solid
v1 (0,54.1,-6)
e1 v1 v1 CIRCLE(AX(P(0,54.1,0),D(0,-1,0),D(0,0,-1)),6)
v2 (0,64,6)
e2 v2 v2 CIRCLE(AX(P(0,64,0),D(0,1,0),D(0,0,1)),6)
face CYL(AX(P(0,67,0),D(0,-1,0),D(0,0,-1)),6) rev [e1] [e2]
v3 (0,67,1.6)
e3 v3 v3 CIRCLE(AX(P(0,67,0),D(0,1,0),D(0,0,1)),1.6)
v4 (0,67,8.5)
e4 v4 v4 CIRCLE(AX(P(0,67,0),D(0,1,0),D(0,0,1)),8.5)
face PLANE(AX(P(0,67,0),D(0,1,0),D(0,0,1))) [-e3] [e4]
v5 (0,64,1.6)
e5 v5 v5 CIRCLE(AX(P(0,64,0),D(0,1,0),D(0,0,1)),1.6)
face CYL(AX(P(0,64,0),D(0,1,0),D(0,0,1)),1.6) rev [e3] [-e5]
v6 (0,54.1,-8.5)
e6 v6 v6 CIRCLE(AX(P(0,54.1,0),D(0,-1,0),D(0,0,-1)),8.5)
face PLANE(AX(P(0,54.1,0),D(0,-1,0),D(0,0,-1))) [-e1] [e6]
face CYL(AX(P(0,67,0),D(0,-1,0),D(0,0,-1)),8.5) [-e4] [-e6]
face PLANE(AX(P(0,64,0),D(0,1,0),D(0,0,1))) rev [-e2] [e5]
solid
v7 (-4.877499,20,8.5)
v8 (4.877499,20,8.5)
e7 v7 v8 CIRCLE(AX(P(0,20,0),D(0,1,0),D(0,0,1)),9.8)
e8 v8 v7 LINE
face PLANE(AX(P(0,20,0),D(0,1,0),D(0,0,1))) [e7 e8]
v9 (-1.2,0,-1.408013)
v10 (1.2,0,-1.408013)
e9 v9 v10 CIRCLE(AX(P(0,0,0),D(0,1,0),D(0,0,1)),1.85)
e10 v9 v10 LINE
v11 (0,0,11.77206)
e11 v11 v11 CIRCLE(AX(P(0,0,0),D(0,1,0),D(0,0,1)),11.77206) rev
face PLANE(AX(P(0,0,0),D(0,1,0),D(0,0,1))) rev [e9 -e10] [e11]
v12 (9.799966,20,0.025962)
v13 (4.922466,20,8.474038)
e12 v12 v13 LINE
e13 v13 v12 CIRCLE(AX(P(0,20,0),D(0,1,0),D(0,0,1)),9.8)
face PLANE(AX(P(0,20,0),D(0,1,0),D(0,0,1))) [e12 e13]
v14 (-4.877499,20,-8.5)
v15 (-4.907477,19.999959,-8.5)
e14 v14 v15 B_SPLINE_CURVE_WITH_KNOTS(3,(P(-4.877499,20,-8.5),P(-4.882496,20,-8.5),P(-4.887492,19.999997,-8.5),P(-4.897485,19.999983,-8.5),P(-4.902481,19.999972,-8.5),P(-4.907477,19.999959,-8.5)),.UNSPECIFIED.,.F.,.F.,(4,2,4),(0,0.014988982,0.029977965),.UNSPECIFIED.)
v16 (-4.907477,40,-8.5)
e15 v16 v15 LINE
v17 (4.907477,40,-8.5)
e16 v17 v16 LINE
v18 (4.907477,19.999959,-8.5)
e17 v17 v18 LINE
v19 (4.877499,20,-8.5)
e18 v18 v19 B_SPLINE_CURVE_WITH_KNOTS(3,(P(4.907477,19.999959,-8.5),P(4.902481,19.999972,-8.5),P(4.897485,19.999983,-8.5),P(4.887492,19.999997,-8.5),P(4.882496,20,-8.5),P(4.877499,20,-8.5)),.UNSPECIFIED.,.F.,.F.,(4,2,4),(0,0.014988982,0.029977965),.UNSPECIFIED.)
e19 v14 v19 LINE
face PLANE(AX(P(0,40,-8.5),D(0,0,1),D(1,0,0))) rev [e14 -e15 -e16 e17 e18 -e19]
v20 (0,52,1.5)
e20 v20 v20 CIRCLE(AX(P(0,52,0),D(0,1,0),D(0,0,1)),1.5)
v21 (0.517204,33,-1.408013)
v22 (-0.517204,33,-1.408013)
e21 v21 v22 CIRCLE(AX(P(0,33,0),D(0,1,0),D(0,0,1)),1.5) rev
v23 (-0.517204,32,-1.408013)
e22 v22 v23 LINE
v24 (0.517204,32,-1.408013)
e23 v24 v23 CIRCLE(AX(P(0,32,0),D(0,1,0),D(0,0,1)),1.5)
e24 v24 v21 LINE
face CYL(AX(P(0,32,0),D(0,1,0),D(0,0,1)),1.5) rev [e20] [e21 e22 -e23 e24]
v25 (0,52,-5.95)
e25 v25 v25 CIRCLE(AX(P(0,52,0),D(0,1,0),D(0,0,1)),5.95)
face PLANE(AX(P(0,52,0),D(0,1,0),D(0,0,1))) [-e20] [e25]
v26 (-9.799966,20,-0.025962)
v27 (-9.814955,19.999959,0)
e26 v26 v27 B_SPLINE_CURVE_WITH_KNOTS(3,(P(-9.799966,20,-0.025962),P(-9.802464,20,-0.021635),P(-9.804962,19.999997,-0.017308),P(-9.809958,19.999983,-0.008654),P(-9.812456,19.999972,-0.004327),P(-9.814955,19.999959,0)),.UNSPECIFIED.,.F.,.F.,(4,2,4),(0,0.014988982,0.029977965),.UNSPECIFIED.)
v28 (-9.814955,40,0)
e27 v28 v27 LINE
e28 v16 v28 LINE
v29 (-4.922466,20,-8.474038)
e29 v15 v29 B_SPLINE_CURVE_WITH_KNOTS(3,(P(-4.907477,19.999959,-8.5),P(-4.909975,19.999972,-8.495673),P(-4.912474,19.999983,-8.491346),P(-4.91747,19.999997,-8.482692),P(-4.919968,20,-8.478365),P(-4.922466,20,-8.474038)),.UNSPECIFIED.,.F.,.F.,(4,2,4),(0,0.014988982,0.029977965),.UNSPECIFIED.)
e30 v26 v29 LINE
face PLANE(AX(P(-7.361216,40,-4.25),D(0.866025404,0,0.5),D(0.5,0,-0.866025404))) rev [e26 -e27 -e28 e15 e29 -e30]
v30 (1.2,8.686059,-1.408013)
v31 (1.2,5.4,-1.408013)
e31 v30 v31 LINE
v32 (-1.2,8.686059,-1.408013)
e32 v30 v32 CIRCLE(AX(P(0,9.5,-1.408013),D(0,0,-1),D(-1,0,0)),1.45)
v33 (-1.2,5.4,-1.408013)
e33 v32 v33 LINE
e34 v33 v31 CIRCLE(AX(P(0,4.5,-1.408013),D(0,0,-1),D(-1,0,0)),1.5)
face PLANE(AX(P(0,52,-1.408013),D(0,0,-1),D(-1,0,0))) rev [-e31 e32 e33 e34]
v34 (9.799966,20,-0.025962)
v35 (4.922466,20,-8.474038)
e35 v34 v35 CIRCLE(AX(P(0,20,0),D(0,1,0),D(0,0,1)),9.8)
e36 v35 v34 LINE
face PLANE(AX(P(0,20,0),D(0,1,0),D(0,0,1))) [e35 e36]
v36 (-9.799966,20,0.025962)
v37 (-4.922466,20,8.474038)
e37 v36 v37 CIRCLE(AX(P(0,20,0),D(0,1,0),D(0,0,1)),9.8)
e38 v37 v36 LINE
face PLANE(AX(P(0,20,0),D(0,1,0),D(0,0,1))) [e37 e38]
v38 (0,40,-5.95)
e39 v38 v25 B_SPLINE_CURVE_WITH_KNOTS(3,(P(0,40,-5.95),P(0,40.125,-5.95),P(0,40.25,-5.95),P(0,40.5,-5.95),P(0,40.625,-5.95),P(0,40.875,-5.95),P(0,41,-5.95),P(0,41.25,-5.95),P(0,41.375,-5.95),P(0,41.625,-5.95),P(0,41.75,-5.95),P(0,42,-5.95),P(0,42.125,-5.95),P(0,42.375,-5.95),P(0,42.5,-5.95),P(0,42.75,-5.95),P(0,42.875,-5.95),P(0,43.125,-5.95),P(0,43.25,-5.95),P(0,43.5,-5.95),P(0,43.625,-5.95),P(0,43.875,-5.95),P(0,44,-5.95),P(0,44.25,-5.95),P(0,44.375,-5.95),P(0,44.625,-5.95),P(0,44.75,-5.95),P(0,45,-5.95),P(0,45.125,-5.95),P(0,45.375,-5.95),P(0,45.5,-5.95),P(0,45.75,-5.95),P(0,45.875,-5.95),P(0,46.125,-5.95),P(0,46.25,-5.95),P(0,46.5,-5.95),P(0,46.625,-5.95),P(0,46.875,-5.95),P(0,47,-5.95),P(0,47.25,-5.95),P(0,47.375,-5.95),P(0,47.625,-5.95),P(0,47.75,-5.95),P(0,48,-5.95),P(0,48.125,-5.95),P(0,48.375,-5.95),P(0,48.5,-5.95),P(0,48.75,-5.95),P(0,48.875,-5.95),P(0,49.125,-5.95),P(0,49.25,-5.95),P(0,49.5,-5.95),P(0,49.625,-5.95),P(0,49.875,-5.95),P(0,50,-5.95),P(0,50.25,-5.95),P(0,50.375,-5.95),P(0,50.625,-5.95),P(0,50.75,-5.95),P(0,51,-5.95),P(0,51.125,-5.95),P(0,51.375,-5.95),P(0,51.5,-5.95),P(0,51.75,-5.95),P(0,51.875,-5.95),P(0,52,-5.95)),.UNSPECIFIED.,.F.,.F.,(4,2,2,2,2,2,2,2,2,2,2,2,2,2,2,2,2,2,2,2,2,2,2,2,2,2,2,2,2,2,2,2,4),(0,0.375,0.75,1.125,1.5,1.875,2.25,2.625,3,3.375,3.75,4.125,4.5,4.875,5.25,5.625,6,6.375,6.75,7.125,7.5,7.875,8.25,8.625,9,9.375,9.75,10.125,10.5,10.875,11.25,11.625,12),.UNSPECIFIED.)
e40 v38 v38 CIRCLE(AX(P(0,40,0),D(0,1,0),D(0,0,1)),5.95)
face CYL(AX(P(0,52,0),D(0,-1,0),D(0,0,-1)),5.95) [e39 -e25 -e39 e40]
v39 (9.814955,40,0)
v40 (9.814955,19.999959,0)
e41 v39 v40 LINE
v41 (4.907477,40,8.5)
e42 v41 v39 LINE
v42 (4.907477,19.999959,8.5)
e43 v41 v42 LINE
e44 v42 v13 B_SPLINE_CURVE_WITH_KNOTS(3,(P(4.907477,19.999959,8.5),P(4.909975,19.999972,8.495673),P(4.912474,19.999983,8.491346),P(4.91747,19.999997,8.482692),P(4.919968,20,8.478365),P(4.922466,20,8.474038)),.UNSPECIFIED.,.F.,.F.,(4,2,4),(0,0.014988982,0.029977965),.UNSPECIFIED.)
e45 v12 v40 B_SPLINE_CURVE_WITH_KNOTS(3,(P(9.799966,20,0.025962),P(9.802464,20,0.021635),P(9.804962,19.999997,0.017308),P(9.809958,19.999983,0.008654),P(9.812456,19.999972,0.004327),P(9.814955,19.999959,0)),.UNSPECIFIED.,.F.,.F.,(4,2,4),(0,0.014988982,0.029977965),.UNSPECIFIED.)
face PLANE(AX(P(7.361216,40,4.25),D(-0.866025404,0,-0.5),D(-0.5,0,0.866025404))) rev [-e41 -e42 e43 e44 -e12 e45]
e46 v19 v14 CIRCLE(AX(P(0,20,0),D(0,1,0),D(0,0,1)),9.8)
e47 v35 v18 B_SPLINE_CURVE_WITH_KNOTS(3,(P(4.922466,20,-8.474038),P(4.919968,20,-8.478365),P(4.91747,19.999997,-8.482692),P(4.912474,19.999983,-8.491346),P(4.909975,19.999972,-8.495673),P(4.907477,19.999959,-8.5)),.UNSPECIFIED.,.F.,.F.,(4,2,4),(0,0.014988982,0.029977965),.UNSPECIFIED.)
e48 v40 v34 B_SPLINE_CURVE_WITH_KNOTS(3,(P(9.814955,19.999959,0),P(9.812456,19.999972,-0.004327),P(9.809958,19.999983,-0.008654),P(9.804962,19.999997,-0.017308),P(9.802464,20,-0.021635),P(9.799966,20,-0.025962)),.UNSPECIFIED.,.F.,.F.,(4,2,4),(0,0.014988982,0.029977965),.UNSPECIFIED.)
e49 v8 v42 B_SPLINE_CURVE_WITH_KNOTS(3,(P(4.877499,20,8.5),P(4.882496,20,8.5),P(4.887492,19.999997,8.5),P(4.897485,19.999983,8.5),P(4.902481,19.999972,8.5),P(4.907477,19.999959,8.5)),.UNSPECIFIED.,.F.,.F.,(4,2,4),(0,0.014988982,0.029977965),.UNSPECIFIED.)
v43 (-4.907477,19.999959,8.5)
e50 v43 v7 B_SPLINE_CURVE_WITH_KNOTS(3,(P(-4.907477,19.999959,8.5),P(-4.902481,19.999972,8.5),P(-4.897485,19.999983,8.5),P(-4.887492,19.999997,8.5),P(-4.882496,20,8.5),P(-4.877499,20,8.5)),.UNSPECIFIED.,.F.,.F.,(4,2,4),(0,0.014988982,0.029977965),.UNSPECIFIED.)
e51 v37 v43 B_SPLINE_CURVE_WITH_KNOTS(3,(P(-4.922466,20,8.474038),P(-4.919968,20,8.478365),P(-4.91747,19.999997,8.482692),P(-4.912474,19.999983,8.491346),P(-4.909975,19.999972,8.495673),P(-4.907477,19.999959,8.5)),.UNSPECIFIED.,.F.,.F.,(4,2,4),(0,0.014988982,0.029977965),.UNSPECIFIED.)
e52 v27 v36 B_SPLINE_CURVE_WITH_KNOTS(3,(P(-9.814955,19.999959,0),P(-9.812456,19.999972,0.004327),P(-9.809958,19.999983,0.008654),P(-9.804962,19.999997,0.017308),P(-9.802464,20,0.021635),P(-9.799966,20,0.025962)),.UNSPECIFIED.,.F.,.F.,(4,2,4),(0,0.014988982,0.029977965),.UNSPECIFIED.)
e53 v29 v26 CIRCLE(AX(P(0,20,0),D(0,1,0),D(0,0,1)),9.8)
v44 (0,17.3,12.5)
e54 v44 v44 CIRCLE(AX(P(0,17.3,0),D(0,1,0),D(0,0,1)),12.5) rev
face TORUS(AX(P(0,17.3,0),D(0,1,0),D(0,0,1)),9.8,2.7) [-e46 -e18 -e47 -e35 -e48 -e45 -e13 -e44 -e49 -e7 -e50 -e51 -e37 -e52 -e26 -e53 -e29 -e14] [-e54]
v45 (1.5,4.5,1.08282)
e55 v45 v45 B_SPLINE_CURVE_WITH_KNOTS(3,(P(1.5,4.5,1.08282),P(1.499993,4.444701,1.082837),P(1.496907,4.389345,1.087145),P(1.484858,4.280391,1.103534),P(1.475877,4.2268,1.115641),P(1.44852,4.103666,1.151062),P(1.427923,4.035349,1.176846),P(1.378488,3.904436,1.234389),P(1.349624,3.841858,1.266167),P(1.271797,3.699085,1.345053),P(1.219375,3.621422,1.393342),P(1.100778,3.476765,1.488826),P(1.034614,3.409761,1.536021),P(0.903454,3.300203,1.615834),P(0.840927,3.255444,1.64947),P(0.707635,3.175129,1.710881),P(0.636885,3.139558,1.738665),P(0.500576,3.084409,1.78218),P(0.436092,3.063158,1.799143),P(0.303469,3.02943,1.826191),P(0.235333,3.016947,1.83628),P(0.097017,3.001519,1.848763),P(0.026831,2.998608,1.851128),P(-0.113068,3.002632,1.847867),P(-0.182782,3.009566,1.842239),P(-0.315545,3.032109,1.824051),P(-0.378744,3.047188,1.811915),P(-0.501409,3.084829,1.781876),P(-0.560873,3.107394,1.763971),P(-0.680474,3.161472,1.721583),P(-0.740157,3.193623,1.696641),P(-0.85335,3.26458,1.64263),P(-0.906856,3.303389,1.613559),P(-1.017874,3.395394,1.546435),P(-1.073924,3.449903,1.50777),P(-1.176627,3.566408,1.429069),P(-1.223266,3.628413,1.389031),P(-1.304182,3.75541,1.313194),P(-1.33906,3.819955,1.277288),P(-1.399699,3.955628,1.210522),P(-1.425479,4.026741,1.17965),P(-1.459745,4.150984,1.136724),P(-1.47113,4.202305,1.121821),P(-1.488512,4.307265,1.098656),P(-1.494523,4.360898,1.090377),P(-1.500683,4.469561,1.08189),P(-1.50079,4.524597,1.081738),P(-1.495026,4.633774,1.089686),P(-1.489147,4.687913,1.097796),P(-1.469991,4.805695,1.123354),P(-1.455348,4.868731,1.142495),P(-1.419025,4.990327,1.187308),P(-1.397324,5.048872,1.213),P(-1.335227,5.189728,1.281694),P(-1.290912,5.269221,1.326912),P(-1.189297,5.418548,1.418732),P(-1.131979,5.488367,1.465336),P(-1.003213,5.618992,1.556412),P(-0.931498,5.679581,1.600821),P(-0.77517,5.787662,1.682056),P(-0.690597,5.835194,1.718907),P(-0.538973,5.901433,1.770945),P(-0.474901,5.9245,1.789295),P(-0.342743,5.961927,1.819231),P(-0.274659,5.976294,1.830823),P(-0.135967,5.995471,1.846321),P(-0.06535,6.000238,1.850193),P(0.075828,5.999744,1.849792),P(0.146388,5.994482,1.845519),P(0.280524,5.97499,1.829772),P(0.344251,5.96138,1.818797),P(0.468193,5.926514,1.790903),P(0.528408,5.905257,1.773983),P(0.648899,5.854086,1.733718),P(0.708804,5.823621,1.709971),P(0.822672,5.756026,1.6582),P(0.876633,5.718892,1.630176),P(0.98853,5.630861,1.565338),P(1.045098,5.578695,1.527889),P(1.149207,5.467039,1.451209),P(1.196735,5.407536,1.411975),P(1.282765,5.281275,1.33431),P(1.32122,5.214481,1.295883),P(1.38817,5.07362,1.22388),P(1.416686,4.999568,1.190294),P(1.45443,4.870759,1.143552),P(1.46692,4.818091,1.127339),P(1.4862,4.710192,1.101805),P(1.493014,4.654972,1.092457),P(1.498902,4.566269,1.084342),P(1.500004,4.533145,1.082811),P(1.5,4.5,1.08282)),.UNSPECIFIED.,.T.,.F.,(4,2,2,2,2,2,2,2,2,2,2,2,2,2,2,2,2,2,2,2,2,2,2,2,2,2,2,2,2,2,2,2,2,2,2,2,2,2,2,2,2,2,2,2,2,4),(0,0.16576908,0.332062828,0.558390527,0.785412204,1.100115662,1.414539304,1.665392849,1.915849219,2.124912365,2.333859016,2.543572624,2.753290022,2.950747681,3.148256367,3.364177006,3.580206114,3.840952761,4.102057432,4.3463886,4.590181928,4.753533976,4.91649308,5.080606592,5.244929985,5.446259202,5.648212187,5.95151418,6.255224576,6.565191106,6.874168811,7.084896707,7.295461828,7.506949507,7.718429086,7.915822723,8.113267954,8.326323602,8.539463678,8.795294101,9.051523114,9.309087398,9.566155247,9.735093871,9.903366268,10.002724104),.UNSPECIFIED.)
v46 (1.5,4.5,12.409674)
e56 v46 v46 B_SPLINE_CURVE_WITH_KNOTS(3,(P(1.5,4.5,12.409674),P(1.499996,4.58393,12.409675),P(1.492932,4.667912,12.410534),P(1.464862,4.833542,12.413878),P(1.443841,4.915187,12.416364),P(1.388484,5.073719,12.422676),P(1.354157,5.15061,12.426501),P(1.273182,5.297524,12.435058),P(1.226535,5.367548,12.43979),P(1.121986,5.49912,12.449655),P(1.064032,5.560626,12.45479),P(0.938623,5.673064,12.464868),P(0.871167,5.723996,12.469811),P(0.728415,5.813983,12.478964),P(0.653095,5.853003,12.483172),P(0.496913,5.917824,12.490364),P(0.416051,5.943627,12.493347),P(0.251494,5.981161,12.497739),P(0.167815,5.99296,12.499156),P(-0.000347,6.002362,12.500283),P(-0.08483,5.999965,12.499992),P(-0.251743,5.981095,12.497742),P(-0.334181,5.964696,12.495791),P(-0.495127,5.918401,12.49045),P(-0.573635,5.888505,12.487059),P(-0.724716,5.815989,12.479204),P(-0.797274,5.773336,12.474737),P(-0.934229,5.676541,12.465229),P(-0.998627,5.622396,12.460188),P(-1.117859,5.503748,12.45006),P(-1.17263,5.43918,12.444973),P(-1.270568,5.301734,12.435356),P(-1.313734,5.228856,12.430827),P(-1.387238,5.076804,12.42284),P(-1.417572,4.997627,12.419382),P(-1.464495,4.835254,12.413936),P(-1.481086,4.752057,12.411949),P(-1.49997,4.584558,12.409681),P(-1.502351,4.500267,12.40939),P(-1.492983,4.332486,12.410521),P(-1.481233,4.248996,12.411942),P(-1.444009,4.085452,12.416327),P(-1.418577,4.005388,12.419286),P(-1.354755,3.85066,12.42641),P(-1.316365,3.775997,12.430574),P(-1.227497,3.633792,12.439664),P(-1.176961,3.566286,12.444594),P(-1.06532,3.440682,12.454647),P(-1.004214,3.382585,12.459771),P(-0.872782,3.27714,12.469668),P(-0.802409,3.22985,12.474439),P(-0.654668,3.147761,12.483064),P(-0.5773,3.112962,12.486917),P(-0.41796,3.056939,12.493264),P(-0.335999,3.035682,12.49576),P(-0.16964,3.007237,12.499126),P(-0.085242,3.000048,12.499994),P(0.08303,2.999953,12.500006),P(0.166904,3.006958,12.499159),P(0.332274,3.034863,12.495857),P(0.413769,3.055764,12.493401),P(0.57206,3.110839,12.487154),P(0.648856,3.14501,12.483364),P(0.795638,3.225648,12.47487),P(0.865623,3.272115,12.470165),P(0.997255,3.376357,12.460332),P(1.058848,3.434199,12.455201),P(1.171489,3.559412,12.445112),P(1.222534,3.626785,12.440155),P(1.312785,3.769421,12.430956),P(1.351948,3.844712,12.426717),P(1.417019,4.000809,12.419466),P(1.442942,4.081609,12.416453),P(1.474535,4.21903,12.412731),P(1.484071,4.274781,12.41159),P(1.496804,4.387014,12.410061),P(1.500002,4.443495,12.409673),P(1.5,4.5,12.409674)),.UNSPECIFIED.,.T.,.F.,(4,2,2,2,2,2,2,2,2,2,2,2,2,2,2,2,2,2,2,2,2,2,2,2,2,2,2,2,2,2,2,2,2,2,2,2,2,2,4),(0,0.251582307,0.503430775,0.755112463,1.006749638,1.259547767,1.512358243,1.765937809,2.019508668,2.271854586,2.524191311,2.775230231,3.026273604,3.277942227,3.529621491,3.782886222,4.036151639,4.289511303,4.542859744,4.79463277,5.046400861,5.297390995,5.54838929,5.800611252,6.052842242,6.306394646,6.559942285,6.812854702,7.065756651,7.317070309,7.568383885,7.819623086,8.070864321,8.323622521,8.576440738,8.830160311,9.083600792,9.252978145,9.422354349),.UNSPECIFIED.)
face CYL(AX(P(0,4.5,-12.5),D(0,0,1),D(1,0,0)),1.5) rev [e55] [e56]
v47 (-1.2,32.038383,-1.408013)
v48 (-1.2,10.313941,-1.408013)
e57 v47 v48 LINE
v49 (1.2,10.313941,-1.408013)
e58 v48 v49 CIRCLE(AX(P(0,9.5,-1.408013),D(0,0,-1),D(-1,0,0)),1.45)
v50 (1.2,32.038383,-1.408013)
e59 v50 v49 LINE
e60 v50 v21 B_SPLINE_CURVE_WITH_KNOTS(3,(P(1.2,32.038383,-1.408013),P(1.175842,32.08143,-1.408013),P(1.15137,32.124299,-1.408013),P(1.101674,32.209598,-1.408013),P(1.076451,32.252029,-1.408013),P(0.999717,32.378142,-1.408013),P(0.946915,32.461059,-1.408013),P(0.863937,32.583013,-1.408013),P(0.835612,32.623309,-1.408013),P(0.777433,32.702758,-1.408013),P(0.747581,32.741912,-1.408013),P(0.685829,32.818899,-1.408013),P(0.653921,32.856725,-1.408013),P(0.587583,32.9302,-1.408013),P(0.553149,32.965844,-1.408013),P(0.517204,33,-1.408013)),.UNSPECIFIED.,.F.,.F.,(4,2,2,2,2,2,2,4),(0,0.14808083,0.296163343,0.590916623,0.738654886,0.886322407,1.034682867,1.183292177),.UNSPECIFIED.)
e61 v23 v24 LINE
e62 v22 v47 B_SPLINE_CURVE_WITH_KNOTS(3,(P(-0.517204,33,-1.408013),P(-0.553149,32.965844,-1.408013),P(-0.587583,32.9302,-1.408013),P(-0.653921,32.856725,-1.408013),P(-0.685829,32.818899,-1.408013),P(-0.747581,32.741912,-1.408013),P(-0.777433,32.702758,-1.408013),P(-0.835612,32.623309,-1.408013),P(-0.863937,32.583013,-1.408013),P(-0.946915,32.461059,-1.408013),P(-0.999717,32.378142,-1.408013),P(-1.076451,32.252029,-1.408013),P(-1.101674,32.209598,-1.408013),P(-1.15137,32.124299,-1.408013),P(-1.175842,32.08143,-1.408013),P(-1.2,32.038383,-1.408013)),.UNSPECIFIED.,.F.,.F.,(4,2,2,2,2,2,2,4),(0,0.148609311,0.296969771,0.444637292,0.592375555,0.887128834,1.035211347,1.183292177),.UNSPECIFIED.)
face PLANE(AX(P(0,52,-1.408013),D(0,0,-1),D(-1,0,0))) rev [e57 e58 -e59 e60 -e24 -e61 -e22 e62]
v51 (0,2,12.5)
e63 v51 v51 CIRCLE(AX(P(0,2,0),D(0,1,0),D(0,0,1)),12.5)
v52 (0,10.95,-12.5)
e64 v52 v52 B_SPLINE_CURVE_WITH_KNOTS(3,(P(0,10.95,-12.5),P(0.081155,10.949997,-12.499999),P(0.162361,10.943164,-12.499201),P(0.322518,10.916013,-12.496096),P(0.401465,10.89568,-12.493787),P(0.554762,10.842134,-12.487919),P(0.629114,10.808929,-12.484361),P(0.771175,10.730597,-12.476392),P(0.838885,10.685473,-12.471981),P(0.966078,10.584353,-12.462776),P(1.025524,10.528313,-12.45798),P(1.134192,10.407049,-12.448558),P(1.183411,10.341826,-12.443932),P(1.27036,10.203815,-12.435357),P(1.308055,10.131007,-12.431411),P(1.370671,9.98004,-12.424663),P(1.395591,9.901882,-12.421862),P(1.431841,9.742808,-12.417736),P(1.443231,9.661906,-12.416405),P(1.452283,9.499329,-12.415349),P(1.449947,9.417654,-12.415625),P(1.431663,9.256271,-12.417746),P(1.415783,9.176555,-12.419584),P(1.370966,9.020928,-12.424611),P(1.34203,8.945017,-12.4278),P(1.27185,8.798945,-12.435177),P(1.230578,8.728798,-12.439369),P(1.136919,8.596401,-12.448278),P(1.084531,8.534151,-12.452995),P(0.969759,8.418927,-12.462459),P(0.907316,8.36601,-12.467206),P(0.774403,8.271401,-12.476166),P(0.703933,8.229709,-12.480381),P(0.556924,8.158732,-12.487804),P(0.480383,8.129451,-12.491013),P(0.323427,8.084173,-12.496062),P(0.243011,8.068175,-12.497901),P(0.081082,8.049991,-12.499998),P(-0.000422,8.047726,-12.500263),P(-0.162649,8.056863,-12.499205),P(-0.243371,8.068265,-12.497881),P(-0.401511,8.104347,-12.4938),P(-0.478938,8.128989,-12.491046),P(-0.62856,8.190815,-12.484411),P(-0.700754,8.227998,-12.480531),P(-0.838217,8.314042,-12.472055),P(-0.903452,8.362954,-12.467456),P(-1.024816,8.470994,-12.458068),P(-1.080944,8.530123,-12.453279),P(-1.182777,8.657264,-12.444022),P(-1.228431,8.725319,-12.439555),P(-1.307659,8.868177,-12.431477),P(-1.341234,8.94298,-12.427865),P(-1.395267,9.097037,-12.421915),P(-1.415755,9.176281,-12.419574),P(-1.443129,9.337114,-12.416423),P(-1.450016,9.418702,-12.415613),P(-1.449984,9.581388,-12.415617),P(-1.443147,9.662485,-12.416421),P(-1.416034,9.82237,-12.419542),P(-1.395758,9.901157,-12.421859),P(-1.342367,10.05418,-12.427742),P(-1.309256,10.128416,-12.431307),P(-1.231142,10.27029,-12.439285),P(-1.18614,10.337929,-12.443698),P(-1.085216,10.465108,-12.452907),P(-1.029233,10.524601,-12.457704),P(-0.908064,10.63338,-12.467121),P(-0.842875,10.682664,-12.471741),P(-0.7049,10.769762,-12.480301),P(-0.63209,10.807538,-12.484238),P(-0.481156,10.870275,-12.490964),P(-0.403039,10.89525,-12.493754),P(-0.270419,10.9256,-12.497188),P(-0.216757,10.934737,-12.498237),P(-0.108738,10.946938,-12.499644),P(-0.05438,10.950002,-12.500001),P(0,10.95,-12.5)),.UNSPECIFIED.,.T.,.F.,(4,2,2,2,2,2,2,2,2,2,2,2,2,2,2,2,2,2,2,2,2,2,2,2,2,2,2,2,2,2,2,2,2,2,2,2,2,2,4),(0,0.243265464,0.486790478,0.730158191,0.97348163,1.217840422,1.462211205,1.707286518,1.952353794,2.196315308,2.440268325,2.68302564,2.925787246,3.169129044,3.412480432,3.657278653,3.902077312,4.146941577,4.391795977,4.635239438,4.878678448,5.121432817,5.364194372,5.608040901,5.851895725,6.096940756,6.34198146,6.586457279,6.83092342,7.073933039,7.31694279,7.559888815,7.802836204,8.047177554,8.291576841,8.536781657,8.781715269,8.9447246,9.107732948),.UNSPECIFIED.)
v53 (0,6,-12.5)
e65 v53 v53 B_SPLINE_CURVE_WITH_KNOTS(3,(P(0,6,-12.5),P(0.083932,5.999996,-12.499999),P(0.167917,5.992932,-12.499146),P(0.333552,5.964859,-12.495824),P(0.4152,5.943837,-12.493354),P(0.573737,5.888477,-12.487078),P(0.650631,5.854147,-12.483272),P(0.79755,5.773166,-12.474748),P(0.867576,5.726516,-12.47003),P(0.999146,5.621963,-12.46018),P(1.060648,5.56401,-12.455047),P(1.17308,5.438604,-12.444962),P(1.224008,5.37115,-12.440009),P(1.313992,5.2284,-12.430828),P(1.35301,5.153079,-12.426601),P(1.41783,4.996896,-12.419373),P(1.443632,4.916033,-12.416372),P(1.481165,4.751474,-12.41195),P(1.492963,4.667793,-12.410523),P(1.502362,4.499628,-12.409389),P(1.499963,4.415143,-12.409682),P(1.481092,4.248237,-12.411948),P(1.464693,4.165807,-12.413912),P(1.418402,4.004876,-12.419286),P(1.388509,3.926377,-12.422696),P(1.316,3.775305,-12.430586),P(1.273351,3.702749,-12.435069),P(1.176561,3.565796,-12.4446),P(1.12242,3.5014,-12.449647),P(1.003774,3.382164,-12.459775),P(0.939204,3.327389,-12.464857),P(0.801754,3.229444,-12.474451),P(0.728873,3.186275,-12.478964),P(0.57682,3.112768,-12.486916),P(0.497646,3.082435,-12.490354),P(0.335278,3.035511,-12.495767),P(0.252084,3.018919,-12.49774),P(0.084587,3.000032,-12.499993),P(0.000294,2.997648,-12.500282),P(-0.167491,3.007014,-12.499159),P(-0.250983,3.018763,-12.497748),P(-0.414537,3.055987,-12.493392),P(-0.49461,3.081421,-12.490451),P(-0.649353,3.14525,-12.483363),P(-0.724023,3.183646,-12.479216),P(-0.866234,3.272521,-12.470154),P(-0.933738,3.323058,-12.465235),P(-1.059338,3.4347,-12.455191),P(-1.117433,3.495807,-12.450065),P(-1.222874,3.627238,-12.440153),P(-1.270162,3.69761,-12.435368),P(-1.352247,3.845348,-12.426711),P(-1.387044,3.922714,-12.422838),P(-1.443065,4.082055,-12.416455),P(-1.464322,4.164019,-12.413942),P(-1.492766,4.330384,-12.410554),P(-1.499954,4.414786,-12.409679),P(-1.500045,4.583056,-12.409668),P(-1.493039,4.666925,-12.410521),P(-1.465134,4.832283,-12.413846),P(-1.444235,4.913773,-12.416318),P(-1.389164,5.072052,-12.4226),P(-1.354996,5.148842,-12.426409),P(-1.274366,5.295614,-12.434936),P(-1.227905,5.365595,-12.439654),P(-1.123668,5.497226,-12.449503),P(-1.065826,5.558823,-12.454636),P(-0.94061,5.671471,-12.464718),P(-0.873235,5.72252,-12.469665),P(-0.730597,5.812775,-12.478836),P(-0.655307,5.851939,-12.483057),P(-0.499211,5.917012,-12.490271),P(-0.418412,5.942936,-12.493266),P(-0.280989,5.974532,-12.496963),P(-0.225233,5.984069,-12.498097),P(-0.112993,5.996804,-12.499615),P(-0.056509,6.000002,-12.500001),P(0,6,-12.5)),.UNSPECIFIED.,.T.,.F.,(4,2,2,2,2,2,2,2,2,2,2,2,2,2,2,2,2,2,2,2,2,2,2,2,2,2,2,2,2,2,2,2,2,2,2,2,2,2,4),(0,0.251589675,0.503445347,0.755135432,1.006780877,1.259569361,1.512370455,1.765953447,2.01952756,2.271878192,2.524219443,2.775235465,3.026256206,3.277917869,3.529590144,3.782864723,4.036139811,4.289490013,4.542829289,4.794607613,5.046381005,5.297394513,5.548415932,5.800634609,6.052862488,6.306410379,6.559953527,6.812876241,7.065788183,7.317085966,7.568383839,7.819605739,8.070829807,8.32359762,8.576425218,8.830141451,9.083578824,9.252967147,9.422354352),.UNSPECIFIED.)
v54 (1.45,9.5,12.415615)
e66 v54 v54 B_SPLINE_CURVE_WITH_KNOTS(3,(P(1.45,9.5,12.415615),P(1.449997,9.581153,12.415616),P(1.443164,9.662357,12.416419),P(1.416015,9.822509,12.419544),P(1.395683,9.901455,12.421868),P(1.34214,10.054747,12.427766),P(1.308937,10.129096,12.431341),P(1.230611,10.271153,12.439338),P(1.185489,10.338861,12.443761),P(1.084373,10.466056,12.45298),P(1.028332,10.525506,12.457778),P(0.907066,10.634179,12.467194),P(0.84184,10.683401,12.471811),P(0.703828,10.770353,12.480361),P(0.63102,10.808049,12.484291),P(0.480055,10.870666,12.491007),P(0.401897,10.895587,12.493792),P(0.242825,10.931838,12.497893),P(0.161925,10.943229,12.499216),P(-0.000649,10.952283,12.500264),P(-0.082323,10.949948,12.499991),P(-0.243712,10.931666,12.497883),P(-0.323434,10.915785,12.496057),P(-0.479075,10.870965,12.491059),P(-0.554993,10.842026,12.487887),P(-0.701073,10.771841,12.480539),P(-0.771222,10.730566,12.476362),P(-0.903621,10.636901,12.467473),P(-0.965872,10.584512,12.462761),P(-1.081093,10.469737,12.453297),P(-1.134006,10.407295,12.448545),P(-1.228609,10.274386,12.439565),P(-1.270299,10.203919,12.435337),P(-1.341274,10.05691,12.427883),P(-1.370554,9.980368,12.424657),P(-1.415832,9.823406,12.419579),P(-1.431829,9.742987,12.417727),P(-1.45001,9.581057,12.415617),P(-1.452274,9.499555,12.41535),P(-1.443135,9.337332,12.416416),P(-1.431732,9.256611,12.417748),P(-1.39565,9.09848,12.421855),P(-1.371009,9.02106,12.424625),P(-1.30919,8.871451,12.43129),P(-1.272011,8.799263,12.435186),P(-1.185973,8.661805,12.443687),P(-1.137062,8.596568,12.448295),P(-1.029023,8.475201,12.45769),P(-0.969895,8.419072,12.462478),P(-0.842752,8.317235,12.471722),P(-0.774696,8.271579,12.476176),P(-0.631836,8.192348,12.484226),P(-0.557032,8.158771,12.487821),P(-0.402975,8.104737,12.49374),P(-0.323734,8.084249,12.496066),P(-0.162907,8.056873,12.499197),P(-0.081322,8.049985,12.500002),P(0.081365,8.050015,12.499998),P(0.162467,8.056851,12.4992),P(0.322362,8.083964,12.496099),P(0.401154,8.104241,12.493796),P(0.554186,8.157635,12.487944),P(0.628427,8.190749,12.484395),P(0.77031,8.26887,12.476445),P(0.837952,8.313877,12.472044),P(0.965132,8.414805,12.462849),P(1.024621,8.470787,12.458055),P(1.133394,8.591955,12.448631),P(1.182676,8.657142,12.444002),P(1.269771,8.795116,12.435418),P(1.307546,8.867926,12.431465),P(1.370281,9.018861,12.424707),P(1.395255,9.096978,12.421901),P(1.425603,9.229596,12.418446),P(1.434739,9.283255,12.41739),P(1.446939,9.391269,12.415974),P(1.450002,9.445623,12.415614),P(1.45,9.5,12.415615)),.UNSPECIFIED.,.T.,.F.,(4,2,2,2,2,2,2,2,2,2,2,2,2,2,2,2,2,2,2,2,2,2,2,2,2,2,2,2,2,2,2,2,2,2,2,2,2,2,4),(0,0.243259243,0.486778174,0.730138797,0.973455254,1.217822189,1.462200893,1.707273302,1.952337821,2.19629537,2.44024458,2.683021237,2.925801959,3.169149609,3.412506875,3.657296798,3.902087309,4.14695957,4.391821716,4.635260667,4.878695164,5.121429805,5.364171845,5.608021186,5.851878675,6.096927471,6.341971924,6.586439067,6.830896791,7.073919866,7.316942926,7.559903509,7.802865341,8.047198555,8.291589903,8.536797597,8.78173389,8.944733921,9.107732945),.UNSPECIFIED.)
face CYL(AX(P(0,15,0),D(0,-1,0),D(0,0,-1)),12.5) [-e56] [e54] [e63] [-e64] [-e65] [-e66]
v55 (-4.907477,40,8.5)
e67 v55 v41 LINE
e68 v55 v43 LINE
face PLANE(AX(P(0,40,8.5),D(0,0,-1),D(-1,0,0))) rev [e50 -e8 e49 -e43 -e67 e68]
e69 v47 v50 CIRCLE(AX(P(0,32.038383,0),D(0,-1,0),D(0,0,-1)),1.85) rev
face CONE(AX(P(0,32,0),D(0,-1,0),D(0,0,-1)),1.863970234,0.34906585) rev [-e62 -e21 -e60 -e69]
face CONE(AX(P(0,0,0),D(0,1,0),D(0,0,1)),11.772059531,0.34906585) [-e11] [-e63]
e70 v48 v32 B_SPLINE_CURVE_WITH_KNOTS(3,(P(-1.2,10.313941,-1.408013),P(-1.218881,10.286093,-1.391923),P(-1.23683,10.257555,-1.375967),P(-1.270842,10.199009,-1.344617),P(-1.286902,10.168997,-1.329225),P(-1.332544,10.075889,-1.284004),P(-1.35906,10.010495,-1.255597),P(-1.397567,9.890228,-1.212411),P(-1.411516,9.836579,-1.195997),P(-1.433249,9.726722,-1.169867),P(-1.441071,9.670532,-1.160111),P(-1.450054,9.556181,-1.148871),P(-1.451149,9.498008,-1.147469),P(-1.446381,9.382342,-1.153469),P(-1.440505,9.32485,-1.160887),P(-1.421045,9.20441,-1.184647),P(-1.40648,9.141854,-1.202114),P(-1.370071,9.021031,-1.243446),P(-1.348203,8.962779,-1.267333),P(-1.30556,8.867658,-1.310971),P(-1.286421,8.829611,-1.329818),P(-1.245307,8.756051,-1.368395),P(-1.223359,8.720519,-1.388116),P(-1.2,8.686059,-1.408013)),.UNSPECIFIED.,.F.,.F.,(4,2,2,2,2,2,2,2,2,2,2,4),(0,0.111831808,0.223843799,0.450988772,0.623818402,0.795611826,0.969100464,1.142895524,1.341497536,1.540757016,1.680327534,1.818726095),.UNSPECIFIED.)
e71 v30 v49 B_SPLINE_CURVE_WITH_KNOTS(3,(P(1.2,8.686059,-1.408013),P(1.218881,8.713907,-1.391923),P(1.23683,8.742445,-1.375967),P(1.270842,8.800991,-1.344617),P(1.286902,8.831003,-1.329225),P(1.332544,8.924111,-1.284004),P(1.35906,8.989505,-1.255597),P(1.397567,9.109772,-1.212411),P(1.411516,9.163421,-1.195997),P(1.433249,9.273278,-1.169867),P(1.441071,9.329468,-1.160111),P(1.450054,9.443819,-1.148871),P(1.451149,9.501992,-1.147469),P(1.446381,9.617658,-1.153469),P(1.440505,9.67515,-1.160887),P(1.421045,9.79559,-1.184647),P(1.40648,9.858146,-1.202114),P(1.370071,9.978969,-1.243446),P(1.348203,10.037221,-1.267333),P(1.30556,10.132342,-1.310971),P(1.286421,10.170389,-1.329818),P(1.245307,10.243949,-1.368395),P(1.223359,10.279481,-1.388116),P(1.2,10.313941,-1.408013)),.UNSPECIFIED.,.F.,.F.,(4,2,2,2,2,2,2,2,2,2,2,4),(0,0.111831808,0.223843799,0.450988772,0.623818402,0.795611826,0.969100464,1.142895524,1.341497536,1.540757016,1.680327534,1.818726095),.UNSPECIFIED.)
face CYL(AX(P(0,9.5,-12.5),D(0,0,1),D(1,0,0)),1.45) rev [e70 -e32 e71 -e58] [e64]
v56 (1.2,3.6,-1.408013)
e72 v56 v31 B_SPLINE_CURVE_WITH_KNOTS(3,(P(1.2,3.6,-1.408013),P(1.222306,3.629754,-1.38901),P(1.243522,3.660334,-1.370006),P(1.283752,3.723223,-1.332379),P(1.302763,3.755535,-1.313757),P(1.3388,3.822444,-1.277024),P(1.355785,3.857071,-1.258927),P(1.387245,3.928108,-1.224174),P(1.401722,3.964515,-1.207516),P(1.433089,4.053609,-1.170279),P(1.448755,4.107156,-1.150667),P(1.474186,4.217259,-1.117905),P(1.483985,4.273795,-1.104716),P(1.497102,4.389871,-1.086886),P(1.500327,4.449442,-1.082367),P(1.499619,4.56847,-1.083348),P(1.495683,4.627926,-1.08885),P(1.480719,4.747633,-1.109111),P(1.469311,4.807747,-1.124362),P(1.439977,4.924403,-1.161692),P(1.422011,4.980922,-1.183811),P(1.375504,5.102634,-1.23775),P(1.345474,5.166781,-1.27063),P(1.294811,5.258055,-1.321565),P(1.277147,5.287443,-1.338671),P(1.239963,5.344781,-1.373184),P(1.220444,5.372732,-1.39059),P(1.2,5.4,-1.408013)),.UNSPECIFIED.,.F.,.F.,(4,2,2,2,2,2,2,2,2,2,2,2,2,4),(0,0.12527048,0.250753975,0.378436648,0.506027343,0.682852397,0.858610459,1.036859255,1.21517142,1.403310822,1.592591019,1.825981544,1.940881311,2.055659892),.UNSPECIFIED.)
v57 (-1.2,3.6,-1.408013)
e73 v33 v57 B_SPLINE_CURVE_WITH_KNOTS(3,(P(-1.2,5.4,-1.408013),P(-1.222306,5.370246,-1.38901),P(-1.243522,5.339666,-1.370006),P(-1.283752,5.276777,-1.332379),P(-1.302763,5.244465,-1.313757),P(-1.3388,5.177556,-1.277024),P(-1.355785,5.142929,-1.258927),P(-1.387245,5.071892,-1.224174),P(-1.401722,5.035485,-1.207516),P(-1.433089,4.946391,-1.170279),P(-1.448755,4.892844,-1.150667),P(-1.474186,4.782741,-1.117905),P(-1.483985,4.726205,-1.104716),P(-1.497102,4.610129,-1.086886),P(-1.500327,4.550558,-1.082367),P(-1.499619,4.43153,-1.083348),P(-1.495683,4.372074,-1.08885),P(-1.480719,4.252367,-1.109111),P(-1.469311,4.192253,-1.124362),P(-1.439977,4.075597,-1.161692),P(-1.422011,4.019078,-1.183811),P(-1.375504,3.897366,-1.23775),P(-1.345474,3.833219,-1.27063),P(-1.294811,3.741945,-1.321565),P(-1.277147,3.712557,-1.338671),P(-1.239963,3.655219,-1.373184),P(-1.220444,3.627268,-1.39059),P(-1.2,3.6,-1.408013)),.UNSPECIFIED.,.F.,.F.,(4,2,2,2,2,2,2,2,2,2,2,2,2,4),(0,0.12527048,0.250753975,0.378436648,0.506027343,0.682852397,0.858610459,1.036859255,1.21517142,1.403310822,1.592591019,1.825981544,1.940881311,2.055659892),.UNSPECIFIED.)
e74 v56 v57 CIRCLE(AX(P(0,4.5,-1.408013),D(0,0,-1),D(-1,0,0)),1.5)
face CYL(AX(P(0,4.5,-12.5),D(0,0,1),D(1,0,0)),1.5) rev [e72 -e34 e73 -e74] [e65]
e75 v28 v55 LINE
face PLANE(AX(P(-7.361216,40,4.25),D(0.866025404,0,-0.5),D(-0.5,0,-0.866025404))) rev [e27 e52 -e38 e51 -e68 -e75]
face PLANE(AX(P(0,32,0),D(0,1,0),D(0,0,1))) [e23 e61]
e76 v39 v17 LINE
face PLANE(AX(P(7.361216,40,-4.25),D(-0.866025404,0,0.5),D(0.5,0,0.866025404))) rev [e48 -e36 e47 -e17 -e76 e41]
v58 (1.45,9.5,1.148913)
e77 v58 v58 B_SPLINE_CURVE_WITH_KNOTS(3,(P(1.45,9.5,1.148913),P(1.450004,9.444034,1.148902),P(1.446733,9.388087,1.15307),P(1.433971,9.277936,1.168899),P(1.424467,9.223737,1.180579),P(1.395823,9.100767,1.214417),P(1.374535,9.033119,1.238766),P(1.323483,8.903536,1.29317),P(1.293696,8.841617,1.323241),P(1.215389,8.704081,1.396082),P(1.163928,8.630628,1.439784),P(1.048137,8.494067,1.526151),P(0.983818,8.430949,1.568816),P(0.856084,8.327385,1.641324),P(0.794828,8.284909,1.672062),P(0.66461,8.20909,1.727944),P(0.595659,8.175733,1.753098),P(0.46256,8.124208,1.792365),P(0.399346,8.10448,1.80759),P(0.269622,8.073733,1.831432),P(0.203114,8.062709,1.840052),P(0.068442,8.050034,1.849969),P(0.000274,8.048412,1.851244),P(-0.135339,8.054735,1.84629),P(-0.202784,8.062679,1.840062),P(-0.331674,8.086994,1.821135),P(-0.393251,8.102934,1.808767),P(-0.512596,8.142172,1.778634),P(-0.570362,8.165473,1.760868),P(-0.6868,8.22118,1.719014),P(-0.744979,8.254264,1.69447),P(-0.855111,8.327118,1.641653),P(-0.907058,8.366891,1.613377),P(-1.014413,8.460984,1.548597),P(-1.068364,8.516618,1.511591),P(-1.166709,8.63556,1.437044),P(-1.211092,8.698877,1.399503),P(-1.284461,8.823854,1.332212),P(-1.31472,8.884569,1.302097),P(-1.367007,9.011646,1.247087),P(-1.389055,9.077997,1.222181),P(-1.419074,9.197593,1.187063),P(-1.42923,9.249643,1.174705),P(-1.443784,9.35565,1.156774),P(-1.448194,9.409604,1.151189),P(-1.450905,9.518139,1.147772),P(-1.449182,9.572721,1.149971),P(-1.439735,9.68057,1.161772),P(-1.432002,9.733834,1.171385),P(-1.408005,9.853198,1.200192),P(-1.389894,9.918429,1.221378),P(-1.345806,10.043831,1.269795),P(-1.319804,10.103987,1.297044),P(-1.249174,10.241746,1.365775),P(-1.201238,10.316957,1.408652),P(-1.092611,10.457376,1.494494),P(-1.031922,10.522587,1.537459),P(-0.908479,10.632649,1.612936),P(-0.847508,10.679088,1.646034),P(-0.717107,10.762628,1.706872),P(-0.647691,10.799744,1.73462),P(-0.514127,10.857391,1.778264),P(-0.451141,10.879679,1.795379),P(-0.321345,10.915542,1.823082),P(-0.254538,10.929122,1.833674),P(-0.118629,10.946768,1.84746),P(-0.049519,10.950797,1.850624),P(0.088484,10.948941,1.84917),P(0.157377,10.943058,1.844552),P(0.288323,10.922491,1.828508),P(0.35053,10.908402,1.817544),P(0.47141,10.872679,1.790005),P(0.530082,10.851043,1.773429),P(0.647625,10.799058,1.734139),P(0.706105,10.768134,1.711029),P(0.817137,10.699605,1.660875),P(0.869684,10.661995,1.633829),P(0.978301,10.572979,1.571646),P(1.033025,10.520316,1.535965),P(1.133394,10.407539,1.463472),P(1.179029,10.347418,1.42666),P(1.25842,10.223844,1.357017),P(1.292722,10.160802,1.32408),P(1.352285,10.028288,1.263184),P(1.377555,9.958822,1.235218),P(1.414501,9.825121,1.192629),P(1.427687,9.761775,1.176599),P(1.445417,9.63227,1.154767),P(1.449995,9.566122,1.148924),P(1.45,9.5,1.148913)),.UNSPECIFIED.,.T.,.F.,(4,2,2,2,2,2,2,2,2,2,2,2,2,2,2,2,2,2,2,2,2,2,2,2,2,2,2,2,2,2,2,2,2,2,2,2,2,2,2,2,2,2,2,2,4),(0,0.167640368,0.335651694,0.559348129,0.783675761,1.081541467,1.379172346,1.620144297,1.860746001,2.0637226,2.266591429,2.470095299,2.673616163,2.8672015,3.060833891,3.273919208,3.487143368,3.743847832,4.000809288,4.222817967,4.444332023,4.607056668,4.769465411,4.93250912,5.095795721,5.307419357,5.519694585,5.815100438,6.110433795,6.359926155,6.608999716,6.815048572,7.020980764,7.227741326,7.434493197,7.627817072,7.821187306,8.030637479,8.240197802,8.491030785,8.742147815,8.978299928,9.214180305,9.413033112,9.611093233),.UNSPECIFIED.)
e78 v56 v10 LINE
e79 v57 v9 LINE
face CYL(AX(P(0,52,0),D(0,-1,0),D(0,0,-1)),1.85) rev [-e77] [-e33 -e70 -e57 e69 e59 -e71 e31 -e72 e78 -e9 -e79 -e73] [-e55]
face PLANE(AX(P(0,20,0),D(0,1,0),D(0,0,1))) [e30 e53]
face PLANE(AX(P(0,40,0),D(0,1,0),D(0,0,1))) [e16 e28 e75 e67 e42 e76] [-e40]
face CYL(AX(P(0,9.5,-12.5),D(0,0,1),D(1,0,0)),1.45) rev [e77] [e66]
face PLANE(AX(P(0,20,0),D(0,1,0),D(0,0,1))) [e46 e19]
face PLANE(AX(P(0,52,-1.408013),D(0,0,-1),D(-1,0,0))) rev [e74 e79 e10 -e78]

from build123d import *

# Parameters (mm, degrees)
SKETCH1_R               = 5.95
BOSS_EXTRUDE1_DEPTH     = 40
SKETCH1_2_R             = 5.95
BOSS_EXTRUDE2_DEPTH     = 52
SKETCH2_R               = 12.5
BOSS_EXTRUDE3_DEPTH     = 15
CUT_EXTRUDE1_DEPTH      = 55.922672914
CUT_EXTRUDE1_DEPTH_BACK = 55.922672914
SKETCH3_R               = 1.45
SKETCH3_R_2             = 1.5
SKETCH5_R               = 12.5
BOSS_EXTRUDE4_DEPTH     = 5
SKETCH7_R               = 8.5
SKETCH7_R_2             = 6
BOSS_EXTRUDE5_DEPTH     = 15
SKETCH8_R               = 6
SKETCH8_R_2             = 1.6
BOSS_EXTRUDE6_DEPTH     = 3
SKETCH9_R               = 8.5
CUT_EXTRUDE4_DEPTH      = 2.1
BOSS_EXTRUDE7_START     = -20
SKETCH6_R               = 1.85
SKETCH6_R_2             = 1.5
BOSS_EXTRUDE7_DEPTH     = 20
CUT_EXTRUDE5_START      = -20
CUT_EXTRUDE5_DEPTH      = 20
CHAMFER1_SIZE           = 1
CHAMFER1_SIZE_2         = 0.363970234
FILLET1_R               = 2.7
CHAMFER2_SIZE           = 2
CHAMFER2_SIZE2          = 0.727940469


with BuildPart() as part:
    # Sketch1 → Boss-Extrude1 (new body)
    with BuildSketch(Plane(origin=(0, 0, 0), x_dir=(1, 0, 0), z_dir=(0, 1, 0))):
        Polygon((-4.907477288, -8.5), (4.907477288, -8.5), (9.814954576, 0), (4.907477288, 8.5), (-4.907477288, 8.5), (-9.814954576, 0), align=None)
        with Locations(Location((0, 0, 0), (0, 0, 270))):
            Circle(SKETCH1_R, mode=Mode.SUBTRACT)
    extrude(amount=BOSS_EXTRUDE1_DEPTH)

    # Sketch1<2> → Boss-Extrude2 (add)
    with BuildSketch(Plane(origin=(0, 0, 0), x_dir=(1, 0, 0), z_dir=(0, 1, 0))):
        with Locations(Location((0, 0, 0), (0, 0, 90))):
            Circle(SKETCH1_2_R)
        with BuildLine():
            Line((-1.2, 1.408012784), (1.2, 1.408012784))
            ThreePointArc((1.2, 1.408012784), (0, -1.85), (-1.2, 1.408012784))
        make_face(mode=Mode.SUBTRACT)
    extrude(amount=BOSS_EXTRUDE2_DEPTH)

    # Sketch2 → Boss-Extrude3 (add)
    with BuildSketch(Plane.XZ):
        with Locations(Location((0, 0, 0), (0, 0, 270))):
            Circle(SKETCH2_R)
        Polygon((4.907477288, 8.5), (-4.907477288, 8.5), (-9.814954576, 0), (-4.907477288, -8.5), (4.907477288, -8.5), (9.814954576, 0), align=None, mode=Mode.SUBTRACT)
    extrude(amount=-BOSS_EXTRUDE3_DEPTH)

    # Sketch3 → Cut-Extrude1 (cut, two sides: drawn at the far end of the back side and taken through both)
    with BuildSketch(Plane.XY.offset(-CUT_EXTRUDE1_DEPTH_BACK)):
        with Locations((0, 9.5)):
            Circle(SKETCH3_R)
        with Locations((0, 4.5)):
            Circle(SKETCH3_R_2)
    extrude(amount=CUT_EXTRUDE1_DEPTH + CUT_EXTRUDE1_DEPTH_BACK, mode=Mode.SUBTRACT)

    # Sketch5 → Boss-Extrude4 (add)
    with BuildSketch(Plane(origin=(0, 15, 0), x_dir=(1, 0, 0), z_dir=(0, 1, 0))):
        with Locations(Location((0, 0, 0), (0, 0, 90))):
            Circle(SKETCH5_R)
        Polygon((9.814954576, 0), (4.907477288, -8.5), (-4.907477288, -8.5), (-9.814954576, 0), (-4.907477288, 8.5), (4.907477288, 8.5), align=None, mode=Mode.SUBTRACT)
    extrude(amount=BOSS_EXTRUDE4_DEPTH)

    # Sketch6 → Boss-Extrude7 (add)
    with BuildSketch(Plane(origin=(0, 52, 0), x_dir=(1, 0, 0), z_dir=(0, 1, 0)).offset(BOSS_EXTRUDE7_START)):
        Circle(SKETCH6_R)
        Circle(SKETCH6_R_2, mode=Mode.SUBTRACT)
    extrude(amount=BOSS_EXTRUDE7_DEPTH)

    # Sketch6<2> → Cut-Extrude5 (cut)
    with BuildSketch(Plane(origin=(0, 52, 0), x_dir=(1, 0, 0), z_dir=(0, 1, 0)).offset(CUT_EXTRUDE5_START)):
        with BuildLine():
            Line((-0.517204022, 1.408012784), (0.517204022, 1.408012784))
            ThreePointArc((0.517204022, 1.408012784), (0, 1.5), (-0.517204022, 1.408012784))
        make_face()
        with BuildLine():
            ThreePointArc((1.5, 0), (1.230001226, 0.858543525), (0.517204022, 1.408012784))
            Line((0.517204022, 1.408012784), (-0.517204022, 1.408012784))
            ThreePointArc((-0.517204022, 1.408012784), (-0.858543525, -1.230001226), (1.5, 0))
        make_face()
    extrude(amount=CUT_EXTRUDE5_DEPTH, mode=Mode.SUBTRACT)

    # Chamfer1
    # the kernel refuses this chamfer: 1, 0.363970234 mm, written as the material it takes off along each edge
    with BuildSketch(Plane(origin=(0, 32, 0), x_dir=(0.9823803136047933, 0, -0.1868928020062522), z_dir=(0.1868928020062522, 0, 0.9823803136047933))) as chamfer1_piece_1_section:
        Polygon((1.5, CHAMFER1_SIZE), (1.5 + CHAMFER1_SIZE_2, 0), (1.5, 0), align=None)
    chamfer1_piece_1 = revolve(axis=Axis((0, 32, 0), (0, 1, 0)), revolution_arc=349.228493073, mode=Mode.PRIVATE)
    chamfer1_piece_1 = chamfer1_piece_1 & Plane(origin=(0, 32.340011658, 0), x_dir=(0.6486486486486487, 0, -0.7610879913691202), z_dir=(0, -1, 0)) * Cylinder(1.85, 8, mode=Mode.PRIVATE)
    chamfer1_piece_1 = split(chamfer1_piece_1, bisect_by=Plane(origin=(1.266565325, 32.340011658, -1.408012784), z_dir=(0, 0, 1)), keep=Keep.TOP, mode=Mode.PRIVATE)
    add(chamfer1_piece_1, mode=Mode.SUBTRACT)
    with BuildSketch(Plane(origin=(0, 32, 0), x_dir=(1, 0, 0), z_dir=(0, 0, 1))) as chamfer1_piece_2_section:
        Polygon((1.5, CHAMFER1_SIZE), (1.5 + CHAMFER1_SIZE_2, 0), (1.5, 0), align=None)
    chamfer1_piece_2 = revolve(axis=Axis((0, 32, 0), (0, 1, 0)), revolution_arc=168.945149076, mode=Mode.PRIVATE)
    chamfer1_piece_2 = chamfer1_piece_2 & Plane(origin=(0, 32.337814983, 0), x_dir=(0.6486486486486487, 0, -0.7610879913691202), z_dir=(0, -1, 0)) * Cylinder(1.85, 8, mode=Mode.PRIVATE)
    chamfer1_piece_2 = split(chamfer1_piece_2, bisect_by=Plane(origin=(1.32853584, 32.337814983, -1.408012784), z_dir=(0, 0, 1)), keep=Keep.TOP, mode=Mode.PRIVATE)
    add(chamfer1_piece_2, mode=Mode.SUBTRACT)

    # Fillet1
    # the kernel refuses this fillet: 2.7 mm, written as the material it takes off along each edge
    with BuildSketch(Plane(origin=(0, 20, 0), x_dir=(0, 0, -1), z_dir=(1, 0, 0))) as fillet1_piece_1_section:
        with BuildLine():
            CenterArc((12.5 - FILLET1_R, -FILLET1_R), FILLET1_R, 0, 90)
            Line((12.5, -FILLET1_R), (12.5, 0))
            Line((12.5, 0), (12.5 - FILLET1_R, 0))
        make_face()
    fillet1_piece_1 = revolve(axis=Axis((0, 20, 0), (0, 1, 0)), mode=Mode.PRIVATE)
    fillet1_piece_1 = split(fillet1_piece_1, bisect_by=Plane(origin=(1.041e-06, 19.432642302, -8.5), z_dir=(0, 0, -1)), keep=Keep.TOP, mode=Mode.PRIVATE)
    add(fillet1_piece_1, mode=Mode.SUBTRACT)
    with BuildSketch(Plane(origin=(0, 20, 0), x_dir=(0, 0, -1), z_dir=(1, 0, 0))) as fillet1_piece_2_section:
        with BuildLine():
            CenterArc((12.5 - FILLET1_R, -FILLET1_R), FILLET1_R, 0, 90)
            Line((12.5, -FILLET1_R), (12.5, 0))
            Line((12.5, 0), (12.5 - FILLET1_R, 0))
        make_face()
    fillet1_piece_2 = revolve(axis=Axis((0, 20, 0), (0, 1, 0)), mode=Mode.PRIVATE)
    fillet1_piece_2 = split(fillet1_piece_2, bisect_by=Plane(origin=(-7.361214724, 19.432641737, -4.250002093), z_dir=(-0.8660254037844416, 0, -0.49999999999999484)), keep=Keep.TOP, mode=Mode.PRIVATE)
    add(fillet1_piece_2, mode=Mode.SUBTRACT)
    with BuildSketch(Plane(origin=(0, 20, 0), x_dir=(0, 0, -1), z_dir=(1, 0, 0))) as fillet1_piece_3_section:
        with BuildLine():
            CenterArc((12.5 - FILLET1_R, -FILLET1_R), FILLET1_R, 0, 90)
            Line((12.5, -FILLET1_R), (12.5, 0))
            Line((12.5, 0), (12.5 - FILLET1_R, 0))
        make_face()
    fillet1_piece_3 = revolve(axis=Axis((0, 20, 0), (0, 1, 0)), mode=Mode.PRIVATE)
    fillet1_piece_3 = split(fillet1_piece_3, bisect_by=Plane(origin=(7.361217141, 19.432641737, -4.249997907), z_dir=(0.8660254037844382, 0, -0.5000000000000011)), keep=Keep.TOP, mode=Mode.PRIVATE)
    add(fillet1_piece_3, mode=Mode.SUBTRACT)
    with BuildSketch(Plane(origin=(0, 20, 0), x_dir=(0, 0, -1), z_dir=(1, 0, 0))) as fillet1_piece_4_section:
        with BuildLine():
            CenterArc((12.5 - FILLET1_R, -FILLET1_R), FILLET1_R, 0, 90)
            Line((12.5, -FILLET1_R), (12.5, 0))
            Line((12.5, 0), (12.5 - FILLET1_R, 0))
        make_face()
    fillet1_piece_4 = revolve(axis=Axis((0, 20, 0), (0, 1, 0)), mode=Mode.PRIVATE)
    fillet1_piece_4 = split(fillet1_piece_4, bisect_by=Plane(origin=(-7.361217141, 19.432641737, 4.249997907), z_dir=(-0.8660254037844347, 0, 0.500000000000007)), keep=Keep.TOP, mode=Mode.PRIVATE)
    add(fillet1_piece_4, mode=Mode.SUBTRACT)
    with BuildSketch(Plane(origin=(0, 20, 0), x_dir=(0, 0, -1), z_dir=(1, 0, 0))) as fillet1_piece_5_section:
        with BuildLine():
            CenterArc((12.5 - FILLET1_R, -FILLET1_R), FILLET1_R, 0, 90)
            Line((12.5, -FILLET1_R), (12.5, 0))
            Line((12.5, 0), (12.5 - FILLET1_R, 0))
        make_face()
    fillet1_piece_5 = revolve(axis=Axis((0, 20, 0), (0, 1, 0)), mode=Mode.PRIVATE)
    fillet1_piece_5 = split(fillet1_piece_5, bisect_by=Plane(origin=(7.361214724, 19.432641737, 4.250002093), z_dir=(0.8660254037844416, 0, 0.49999999999999495)), keep=Keep.TOP, mode=Mode.PRIVATE)
    add(fillet1_piece_5, mode=Mode.SUBTRACT)
    with BuildSketch(Plane(origin=(0, 20, 0), x_dir=(0, 0, -1), z_dir=(1, 0, 0))) as fillet1_piece_6_section:
        with BuildLine():
            CenterArc((12.5 - FILLET1_R, -FILLET1_R), FILLET1_R, 0, 90)
            Line((12.5, -FILLET1_R), (12.5, 0))
            Line((12.5, 0), (12.5 - FILLET1_R, 0))
        make_face()
    fillet1_piece_6 = revolve(axis=Axis((0, 20, 0), (0, 1, 0)), mode=Mode.PRIVATE)
    fillet1_piece_6 = split(fillet1_piece_6, bisect_by=Plane(origin=(-2.417e-06, 19.432641737, 8.5), z_dir=(0, 0, 1)), keep=Keep.TOP, mode=Mode.PRIVATE)
    add(fillet1_piece_6, mode=Mode.SUBTRACT)

    # Chamfer2
    chamfer2_edges = [part.edges().sort_by_distance(p)[0] for p in [
        (0, 0, 12.5),
    ]]
    chamfer2_side = [part.faces().sort_by_distance(p)[0] for p in [
        (0, 7.5, 12.5),
    ]]
    chamfer(chamfer2_edges, length=CHAMFER2_SIZE, length2=CHAMFER2_SIZE2, reference=chamfer2_side[0])


with BuildPart() as body_2:
    # Sketch7 → Boss-Extrude5 (new body)
    with BuildSketch(Plane(origin=(0, 52, 0), x_dir=(1, 0, 0), z_dir=(0, 1, 0))):
        with Locations(Location((0, 0, 0), (0, 0, 270))):
            Circle(SKETCH7_R)
        with Locations(Location((0, 0, 0), (0, 0, 270))):
            Circle(SKETCH7_R_2, mode=Mode.SUBTRACT)
    extrude(amount=BOSS_EXTRUDE5_DEPTH)

    # Sketch8 → Boss-Extrude6 (add)
    with BuildSketch(Plane(origin=(0, 67, 0), x_dir=(1, 0, 0), z_dir=(0, 1, 0))):
        with Locations(Location((0, 0, 0), (0, 0, 270))):
            Circle(SKETCH8_R)
        with Locations(Location((0, 0, 0), (0, 0, 270))):
            Circle(SKETCH8_R_2, mode=Mode.SUBTRACT)
    extrude(amount=-BOSS_EXTRUDE6_DEPTH)

    # Sketch9 → Cut-Extrude4 (cut)
    with BuildSketch(Plane.XZ.offset(-52)):
        with Locations(Location((0, 0, 0), (0, 0, 270))):
            Circle(SKETCH9_R)
    extrude(amount=-CUT_EXTRUDE4_DEPTH, mode=Mode.SUBTRACT)


solid = Compound([part.part, body_2.part])
